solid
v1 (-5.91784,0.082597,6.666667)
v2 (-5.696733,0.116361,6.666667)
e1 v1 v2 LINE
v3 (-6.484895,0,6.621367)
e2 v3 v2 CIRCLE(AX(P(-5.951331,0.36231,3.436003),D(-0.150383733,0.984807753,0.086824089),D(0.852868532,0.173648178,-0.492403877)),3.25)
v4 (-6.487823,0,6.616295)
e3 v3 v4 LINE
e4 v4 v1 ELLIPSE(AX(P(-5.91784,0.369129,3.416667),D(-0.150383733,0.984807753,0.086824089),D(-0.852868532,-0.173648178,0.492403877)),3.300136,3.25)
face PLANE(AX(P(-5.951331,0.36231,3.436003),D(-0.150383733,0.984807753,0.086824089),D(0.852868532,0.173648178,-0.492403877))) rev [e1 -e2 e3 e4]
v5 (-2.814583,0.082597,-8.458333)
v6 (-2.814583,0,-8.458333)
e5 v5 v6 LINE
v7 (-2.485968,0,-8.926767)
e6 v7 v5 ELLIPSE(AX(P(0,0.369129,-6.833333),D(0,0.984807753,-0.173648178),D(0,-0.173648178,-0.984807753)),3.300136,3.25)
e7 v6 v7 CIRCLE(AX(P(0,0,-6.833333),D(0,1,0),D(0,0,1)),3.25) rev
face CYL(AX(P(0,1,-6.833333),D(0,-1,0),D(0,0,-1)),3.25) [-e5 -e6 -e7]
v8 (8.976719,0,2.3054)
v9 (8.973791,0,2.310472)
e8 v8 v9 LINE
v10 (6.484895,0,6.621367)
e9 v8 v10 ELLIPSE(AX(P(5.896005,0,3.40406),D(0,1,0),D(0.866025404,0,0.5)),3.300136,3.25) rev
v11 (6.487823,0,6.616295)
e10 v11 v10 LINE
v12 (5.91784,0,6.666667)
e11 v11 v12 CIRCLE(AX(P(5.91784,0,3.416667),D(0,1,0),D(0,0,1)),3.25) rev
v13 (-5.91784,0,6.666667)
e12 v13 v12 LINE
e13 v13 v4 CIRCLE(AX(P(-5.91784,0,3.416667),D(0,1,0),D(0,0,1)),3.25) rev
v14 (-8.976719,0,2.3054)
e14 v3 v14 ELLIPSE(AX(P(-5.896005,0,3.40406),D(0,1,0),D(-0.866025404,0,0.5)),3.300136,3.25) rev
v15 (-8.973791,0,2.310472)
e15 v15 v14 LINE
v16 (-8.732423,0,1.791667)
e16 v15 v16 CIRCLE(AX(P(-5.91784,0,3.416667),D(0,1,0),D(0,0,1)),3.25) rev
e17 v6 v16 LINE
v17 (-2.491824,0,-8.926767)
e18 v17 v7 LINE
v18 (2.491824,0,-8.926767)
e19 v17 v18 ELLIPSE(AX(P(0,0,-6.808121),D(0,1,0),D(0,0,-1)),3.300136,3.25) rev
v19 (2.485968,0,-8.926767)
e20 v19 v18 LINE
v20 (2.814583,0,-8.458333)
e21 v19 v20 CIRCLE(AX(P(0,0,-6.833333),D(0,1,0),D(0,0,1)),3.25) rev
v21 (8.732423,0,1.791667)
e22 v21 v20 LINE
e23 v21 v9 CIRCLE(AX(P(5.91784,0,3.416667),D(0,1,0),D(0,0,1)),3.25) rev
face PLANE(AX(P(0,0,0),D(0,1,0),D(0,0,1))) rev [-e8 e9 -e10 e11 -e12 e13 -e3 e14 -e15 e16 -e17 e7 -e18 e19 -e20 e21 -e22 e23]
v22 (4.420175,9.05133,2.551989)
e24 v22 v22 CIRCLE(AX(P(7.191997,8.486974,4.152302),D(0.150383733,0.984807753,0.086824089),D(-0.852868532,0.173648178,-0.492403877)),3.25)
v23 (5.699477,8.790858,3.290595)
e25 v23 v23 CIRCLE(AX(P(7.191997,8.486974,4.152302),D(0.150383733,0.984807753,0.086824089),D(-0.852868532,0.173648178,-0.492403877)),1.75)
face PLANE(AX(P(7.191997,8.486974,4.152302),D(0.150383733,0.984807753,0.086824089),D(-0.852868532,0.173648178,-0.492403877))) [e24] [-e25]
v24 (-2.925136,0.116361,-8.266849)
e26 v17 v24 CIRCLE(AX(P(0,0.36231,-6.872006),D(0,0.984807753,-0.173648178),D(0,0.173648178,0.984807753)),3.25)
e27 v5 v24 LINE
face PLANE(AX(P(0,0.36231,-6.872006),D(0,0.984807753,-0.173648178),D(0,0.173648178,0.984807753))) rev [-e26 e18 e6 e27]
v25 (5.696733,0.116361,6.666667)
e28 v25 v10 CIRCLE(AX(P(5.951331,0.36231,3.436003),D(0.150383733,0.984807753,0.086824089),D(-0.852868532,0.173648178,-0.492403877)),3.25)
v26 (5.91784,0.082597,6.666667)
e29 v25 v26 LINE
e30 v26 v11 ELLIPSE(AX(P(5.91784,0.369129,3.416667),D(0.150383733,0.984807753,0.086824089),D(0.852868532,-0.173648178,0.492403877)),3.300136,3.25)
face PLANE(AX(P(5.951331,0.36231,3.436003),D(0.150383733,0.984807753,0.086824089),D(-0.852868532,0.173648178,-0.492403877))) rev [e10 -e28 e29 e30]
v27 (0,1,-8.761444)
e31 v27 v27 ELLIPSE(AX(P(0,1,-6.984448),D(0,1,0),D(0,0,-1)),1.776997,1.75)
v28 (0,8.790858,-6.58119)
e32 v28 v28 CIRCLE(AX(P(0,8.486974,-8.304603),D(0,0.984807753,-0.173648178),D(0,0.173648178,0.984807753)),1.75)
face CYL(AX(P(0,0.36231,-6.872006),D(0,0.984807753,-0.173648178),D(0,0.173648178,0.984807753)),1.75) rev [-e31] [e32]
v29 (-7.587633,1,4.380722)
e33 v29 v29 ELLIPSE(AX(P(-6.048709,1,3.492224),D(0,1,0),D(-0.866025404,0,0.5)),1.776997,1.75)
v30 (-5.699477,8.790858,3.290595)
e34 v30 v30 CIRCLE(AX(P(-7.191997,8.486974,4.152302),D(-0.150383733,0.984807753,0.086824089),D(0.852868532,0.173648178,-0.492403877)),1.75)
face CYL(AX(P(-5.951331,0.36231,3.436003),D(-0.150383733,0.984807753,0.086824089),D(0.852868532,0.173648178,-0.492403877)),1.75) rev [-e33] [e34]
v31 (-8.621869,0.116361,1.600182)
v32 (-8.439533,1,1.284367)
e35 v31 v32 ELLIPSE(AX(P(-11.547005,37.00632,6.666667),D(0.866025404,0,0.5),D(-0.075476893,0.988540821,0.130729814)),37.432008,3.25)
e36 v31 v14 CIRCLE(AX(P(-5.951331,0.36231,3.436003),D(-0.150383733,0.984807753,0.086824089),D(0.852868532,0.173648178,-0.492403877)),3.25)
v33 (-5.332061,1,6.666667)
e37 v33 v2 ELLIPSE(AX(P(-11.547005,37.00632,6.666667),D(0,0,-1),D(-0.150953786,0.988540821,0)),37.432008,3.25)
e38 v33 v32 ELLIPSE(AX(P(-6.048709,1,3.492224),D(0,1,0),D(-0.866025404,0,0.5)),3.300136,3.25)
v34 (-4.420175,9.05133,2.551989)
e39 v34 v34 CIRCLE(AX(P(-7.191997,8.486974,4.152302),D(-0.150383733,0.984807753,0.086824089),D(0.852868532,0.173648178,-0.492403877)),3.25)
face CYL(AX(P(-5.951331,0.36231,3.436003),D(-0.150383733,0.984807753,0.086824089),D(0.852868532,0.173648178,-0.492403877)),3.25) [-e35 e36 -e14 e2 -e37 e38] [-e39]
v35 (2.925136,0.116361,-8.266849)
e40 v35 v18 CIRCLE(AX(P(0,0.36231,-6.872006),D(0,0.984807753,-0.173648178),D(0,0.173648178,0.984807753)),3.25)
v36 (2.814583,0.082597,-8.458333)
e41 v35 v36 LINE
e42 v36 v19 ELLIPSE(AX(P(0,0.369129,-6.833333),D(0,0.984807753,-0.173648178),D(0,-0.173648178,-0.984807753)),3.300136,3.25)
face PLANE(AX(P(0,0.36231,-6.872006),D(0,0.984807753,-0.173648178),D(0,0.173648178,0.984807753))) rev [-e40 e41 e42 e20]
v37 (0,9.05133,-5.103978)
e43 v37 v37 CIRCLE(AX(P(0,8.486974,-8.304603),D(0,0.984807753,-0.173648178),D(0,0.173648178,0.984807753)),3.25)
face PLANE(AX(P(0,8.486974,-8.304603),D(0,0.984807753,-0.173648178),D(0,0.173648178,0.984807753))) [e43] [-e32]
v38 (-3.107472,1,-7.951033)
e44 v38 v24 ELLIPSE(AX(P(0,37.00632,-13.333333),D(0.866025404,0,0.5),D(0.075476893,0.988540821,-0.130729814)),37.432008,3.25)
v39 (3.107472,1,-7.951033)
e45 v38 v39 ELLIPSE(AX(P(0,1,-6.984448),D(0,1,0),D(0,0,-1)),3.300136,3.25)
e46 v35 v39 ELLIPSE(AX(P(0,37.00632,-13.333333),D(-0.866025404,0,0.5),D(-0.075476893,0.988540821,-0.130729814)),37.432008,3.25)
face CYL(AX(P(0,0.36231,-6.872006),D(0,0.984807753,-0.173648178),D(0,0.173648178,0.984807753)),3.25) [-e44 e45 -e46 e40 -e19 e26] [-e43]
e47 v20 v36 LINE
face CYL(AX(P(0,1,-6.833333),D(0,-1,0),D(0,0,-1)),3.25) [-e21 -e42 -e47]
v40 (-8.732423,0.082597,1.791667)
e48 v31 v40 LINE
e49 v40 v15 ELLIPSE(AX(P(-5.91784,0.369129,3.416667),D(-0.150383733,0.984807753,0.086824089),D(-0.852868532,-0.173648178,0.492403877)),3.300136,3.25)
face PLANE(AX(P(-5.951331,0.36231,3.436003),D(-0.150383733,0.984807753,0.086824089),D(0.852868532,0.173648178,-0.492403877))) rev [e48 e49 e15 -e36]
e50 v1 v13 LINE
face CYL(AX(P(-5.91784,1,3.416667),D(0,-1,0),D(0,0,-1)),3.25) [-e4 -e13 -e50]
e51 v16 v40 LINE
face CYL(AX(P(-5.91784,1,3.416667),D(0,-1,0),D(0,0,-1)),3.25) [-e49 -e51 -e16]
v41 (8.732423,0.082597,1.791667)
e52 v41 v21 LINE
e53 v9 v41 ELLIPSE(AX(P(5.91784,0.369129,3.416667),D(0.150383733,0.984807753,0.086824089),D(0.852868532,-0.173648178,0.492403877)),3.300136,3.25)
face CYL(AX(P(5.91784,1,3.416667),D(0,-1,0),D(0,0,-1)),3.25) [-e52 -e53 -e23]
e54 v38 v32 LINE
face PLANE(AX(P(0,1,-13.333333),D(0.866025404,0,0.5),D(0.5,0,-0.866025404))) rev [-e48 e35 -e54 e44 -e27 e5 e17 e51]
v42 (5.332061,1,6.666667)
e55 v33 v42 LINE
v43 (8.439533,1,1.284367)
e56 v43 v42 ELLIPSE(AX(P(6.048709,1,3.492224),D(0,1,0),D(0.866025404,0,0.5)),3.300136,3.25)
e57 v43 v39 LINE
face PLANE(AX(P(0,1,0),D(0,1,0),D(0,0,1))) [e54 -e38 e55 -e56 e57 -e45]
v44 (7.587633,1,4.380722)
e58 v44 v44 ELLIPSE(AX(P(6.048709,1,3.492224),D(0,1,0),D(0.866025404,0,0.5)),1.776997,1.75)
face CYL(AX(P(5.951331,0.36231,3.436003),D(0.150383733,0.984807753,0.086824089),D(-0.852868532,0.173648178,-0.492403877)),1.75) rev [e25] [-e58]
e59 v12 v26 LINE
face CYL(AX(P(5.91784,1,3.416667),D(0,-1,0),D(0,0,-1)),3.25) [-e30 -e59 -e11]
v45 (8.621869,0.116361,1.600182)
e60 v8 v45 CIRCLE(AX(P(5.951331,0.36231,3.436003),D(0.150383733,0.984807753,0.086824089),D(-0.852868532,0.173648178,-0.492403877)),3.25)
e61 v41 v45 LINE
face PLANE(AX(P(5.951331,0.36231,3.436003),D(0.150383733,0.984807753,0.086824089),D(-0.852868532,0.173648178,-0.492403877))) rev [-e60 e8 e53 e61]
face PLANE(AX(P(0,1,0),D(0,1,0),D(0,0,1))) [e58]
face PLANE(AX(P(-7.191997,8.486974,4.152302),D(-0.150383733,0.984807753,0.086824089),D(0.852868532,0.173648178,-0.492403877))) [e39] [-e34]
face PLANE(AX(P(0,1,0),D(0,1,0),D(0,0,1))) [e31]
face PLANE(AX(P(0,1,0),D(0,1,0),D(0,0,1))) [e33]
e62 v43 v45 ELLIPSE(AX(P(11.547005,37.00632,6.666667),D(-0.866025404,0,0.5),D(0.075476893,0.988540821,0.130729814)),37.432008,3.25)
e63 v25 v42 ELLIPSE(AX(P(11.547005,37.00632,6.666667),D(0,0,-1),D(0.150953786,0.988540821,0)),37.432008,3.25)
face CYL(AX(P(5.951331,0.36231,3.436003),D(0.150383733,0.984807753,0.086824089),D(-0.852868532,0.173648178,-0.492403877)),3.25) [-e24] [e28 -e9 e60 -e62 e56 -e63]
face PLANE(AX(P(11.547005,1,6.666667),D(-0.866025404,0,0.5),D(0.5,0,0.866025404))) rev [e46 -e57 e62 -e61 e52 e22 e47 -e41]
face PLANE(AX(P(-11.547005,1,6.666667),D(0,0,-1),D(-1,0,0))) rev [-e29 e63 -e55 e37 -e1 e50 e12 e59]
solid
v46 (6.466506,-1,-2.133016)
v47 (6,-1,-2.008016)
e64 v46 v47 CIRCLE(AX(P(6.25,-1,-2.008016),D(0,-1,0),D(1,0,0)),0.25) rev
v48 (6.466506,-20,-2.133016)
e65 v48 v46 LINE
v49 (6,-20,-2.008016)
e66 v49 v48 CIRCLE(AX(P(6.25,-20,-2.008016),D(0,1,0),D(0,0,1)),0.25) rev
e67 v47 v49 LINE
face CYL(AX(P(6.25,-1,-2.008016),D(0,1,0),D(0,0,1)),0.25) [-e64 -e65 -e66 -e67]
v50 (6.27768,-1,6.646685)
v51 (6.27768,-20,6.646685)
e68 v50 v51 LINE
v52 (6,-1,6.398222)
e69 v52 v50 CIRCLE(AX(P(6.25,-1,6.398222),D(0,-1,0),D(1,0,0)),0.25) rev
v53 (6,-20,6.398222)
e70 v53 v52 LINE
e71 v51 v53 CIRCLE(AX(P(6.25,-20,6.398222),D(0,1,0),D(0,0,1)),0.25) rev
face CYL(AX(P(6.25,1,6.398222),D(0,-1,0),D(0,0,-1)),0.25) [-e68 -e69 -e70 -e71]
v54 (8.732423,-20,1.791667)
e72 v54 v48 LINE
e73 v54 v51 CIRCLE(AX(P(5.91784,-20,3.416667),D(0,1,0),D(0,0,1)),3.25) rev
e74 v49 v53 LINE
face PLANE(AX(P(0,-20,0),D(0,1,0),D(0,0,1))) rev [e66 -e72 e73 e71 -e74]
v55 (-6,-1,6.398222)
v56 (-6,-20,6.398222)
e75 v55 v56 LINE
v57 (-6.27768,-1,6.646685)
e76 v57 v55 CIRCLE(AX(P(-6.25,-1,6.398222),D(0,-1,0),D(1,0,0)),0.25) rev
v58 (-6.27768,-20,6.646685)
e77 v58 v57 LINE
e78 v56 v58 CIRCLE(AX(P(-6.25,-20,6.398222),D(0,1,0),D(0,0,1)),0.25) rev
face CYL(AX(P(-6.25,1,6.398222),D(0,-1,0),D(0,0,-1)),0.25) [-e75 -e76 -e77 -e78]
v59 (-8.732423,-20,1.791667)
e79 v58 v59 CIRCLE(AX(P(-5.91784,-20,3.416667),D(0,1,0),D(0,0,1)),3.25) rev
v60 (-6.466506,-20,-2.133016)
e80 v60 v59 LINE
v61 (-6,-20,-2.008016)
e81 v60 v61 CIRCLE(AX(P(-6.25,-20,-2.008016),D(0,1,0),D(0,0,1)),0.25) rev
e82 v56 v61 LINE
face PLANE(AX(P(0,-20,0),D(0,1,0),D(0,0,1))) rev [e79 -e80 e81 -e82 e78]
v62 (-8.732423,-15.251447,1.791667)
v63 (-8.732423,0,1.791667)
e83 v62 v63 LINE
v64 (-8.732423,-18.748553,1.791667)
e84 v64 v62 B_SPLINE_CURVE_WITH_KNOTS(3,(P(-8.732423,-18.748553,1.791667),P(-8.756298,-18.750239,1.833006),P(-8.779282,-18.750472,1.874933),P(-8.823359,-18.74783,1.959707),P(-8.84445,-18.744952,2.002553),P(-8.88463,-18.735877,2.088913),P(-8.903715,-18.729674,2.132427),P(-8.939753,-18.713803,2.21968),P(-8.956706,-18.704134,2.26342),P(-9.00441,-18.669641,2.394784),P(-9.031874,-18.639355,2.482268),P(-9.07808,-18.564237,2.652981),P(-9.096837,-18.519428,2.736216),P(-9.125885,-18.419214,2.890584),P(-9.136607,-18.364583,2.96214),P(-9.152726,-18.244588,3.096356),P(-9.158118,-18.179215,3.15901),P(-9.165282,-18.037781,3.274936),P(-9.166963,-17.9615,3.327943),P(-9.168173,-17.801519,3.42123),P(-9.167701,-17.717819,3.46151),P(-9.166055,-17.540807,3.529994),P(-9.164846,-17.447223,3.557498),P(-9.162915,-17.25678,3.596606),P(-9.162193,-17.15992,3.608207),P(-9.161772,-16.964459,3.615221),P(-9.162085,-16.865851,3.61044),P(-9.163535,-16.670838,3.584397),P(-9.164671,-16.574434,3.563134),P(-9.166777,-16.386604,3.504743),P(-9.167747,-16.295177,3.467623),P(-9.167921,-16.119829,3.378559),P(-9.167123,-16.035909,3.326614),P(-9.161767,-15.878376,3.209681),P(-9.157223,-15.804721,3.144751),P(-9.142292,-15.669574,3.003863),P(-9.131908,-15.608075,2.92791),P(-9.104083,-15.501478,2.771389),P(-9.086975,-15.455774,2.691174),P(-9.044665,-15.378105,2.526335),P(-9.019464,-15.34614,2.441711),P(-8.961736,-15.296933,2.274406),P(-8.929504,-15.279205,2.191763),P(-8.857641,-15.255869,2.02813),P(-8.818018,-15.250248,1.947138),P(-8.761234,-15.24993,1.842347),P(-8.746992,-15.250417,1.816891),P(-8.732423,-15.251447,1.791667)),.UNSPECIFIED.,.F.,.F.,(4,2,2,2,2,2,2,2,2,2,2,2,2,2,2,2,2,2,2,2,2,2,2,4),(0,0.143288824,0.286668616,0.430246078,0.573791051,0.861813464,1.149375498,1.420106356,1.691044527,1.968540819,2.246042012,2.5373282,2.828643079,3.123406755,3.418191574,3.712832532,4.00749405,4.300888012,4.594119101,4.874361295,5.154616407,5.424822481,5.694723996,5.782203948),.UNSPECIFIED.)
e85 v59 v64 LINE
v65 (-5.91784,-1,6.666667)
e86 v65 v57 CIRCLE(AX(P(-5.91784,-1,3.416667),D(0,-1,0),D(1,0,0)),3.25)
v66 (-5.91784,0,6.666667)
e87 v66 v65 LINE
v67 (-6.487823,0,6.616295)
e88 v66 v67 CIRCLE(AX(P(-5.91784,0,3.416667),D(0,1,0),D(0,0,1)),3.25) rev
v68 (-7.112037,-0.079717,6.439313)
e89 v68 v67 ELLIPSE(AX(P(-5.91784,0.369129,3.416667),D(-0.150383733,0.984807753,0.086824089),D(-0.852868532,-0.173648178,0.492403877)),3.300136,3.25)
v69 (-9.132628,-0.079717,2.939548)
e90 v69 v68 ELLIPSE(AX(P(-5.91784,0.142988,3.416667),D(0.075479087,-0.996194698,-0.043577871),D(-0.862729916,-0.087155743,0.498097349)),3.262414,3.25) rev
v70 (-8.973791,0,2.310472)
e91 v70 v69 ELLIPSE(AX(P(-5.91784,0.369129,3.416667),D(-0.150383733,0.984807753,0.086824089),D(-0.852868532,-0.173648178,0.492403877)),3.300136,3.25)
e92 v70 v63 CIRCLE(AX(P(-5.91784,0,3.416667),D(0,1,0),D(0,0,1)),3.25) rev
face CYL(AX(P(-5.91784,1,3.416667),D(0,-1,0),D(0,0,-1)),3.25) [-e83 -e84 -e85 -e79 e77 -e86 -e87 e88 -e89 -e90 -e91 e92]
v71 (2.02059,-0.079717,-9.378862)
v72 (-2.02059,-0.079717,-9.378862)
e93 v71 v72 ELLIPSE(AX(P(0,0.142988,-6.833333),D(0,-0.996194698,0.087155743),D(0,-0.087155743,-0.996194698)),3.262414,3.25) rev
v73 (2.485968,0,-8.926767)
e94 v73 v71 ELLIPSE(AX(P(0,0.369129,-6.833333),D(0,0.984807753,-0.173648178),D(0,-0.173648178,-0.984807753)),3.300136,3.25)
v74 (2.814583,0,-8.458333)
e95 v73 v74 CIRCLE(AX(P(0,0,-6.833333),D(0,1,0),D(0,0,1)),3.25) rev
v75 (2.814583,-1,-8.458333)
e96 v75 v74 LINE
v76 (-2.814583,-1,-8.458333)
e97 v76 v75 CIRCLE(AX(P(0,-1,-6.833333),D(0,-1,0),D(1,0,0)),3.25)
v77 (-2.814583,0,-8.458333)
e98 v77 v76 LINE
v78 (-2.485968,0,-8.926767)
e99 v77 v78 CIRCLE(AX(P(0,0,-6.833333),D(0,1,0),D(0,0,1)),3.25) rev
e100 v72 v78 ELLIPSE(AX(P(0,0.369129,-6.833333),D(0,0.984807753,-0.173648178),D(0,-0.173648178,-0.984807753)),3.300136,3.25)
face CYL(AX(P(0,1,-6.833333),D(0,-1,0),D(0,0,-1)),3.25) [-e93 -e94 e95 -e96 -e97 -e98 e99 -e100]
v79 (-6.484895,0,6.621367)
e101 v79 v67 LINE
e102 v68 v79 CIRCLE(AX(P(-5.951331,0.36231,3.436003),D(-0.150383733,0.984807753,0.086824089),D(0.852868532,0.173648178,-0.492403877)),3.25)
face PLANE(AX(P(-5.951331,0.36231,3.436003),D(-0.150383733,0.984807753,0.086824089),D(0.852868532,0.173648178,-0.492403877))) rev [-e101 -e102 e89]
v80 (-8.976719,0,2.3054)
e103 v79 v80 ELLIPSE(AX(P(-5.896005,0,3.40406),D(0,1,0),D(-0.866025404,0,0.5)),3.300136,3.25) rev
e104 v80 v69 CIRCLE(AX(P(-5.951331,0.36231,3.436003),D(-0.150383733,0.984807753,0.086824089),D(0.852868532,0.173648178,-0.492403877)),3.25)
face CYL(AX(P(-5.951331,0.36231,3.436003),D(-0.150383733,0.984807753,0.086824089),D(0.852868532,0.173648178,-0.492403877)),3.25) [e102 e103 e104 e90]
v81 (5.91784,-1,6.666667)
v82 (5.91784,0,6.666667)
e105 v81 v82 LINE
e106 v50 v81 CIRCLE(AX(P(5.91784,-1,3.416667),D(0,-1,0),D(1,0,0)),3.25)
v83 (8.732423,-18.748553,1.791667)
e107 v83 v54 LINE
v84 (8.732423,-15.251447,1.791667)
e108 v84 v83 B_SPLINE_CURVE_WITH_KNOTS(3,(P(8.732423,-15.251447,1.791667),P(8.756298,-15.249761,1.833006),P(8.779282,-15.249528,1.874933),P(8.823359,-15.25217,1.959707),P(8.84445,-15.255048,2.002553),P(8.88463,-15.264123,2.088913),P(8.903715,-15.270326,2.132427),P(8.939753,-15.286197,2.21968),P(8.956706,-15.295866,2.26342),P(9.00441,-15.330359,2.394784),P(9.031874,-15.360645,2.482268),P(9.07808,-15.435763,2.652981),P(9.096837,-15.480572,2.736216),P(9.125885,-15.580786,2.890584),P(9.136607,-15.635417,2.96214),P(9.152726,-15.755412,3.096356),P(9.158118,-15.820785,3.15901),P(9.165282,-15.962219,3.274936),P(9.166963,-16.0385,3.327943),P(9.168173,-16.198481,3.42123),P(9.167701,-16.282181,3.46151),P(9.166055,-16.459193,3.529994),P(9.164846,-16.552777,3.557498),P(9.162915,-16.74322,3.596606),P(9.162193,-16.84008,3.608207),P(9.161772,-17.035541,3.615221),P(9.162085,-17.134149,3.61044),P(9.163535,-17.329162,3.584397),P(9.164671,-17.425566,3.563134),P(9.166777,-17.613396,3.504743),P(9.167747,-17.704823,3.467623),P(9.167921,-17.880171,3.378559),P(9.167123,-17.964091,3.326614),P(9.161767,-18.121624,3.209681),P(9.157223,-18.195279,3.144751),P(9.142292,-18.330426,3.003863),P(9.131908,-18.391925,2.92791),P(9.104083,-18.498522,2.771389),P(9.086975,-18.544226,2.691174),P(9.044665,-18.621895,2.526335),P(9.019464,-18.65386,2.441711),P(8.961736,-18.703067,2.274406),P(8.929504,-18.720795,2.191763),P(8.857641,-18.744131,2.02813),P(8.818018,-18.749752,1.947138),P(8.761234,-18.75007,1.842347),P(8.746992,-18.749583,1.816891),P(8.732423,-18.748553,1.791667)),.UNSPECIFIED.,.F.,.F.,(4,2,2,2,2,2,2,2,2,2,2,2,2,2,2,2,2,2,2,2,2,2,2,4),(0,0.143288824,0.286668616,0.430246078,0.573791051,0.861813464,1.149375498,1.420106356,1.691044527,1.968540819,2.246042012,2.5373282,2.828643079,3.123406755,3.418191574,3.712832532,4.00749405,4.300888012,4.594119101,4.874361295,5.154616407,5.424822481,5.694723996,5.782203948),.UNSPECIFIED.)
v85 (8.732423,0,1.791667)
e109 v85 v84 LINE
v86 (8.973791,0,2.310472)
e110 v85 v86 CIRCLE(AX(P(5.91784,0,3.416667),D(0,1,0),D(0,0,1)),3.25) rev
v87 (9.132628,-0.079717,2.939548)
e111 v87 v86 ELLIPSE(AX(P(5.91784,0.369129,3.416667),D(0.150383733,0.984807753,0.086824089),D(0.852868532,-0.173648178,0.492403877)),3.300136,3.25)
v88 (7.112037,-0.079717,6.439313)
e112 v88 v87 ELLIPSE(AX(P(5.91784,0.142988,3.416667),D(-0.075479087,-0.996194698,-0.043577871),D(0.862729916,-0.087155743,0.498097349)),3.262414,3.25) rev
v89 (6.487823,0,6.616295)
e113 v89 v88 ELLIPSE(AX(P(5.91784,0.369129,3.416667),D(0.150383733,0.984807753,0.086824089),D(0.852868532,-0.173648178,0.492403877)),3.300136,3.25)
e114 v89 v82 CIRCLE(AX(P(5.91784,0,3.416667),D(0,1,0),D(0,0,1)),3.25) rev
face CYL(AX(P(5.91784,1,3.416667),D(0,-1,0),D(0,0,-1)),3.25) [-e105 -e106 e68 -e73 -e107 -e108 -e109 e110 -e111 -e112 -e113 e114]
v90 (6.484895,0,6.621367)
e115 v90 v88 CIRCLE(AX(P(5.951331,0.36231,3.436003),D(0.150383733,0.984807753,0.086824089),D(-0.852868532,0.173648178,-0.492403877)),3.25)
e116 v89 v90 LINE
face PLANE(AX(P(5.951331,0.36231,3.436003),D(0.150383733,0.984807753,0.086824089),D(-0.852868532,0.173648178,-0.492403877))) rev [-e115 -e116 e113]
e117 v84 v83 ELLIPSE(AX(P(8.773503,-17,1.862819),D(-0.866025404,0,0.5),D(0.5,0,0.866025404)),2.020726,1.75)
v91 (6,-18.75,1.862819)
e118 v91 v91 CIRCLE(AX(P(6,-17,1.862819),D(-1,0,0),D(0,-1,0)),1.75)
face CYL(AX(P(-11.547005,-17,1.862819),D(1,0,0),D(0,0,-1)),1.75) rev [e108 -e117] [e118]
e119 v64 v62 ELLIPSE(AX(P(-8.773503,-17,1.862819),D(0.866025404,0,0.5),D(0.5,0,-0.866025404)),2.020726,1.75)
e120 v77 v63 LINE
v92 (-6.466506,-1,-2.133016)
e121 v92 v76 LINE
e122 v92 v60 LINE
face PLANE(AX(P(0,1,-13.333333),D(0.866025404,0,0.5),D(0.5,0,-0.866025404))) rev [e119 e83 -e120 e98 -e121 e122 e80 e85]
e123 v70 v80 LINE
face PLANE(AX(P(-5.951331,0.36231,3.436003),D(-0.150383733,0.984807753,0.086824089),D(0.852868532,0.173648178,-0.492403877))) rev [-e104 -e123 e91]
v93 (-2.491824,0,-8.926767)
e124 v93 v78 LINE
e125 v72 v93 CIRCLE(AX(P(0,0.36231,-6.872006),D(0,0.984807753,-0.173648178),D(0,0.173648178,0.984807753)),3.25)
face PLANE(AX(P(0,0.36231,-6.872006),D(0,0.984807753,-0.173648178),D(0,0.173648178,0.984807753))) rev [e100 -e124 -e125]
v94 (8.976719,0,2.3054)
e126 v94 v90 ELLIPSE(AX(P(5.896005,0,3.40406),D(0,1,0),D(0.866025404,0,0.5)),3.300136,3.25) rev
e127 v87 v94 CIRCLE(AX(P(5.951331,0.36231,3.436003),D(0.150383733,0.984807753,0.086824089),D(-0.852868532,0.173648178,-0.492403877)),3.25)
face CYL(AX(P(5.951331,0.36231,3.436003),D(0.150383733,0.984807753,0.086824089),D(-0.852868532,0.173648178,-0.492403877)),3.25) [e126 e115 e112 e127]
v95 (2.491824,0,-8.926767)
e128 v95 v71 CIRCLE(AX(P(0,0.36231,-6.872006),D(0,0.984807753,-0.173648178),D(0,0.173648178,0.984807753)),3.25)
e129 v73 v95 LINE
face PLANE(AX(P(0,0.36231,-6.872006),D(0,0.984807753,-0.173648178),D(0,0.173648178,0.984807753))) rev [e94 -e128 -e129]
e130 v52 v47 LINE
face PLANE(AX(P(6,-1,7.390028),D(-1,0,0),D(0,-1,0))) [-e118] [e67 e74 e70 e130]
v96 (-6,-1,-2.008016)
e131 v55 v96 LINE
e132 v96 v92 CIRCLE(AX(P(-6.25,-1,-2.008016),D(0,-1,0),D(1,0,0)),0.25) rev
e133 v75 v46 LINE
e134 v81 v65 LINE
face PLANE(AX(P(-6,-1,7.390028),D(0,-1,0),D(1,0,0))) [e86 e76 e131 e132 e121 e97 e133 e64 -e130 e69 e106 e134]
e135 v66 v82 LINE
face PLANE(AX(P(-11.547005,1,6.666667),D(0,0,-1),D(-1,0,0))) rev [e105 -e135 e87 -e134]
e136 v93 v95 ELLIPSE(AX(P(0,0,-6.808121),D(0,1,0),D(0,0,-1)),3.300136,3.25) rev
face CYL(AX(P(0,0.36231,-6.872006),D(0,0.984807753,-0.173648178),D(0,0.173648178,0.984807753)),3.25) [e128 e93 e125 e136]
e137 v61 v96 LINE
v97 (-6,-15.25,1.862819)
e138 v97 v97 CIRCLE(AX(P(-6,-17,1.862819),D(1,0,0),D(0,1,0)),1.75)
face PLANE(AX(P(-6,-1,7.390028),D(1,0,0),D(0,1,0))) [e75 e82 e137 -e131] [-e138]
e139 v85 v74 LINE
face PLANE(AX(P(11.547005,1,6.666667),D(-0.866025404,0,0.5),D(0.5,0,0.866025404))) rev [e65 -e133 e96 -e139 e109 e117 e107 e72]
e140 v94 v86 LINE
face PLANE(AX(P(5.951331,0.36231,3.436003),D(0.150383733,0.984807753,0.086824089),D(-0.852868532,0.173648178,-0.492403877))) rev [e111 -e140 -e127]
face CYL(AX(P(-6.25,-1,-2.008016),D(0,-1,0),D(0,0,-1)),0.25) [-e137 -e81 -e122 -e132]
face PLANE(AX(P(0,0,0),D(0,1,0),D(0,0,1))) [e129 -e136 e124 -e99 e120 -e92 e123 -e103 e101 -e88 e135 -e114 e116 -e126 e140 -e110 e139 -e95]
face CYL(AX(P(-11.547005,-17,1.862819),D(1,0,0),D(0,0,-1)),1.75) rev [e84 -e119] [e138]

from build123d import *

# Parameters (mm, degrees)
BOSS_EXTRUDE1_DEPTH     = 1
BOSS_EXTRUDE2_START     = -0.013518
SKETCH2_R               = 3.25
SKETCH2_R_2             = 1.75
BOSS_EXTRUDE2_DEPTH     = 8.25
CIRPATTERN4_COUNT       = 3
BOSS_EXTRUDE3_DEPTH     = 20
CUT_EXTRUDE1_DEPTH      = 27.666666667
CUT_EXTRUDE1_DEPTH_BACK = 27.666666667
SKETCH5_W               = 12
SKETCH5_H               = 19
CUT_EXTRUDE2_DEPTH      = 27.666666667
CUT_EXTRUDE2_DEPTH_BACK = 27.666666667
SKETCH6_R               = 1.75
FILLET1_R               = 3.25
FILLET2_R               = 0.25


with BuildPart() as part:
    # Sketch1 → Boss-Extrude1 (new body)
    with BuildSketch(Plane(origin=(0, 0, 0), x_dir=(1, 0, 0), z_dir=(0, 1, 0))):
        Polygon((0, 13.333333333), (-11.547005384, -6.666666667), (11.547005384, -6.666666667), align=None)
    extrude(amount=BOSS_EXTRUDE1_DEPTH)

    # Sketch2 → Boss-Extrude2 (add)
    with BuildSketch(Plane(origin=(0, 1.539879883, -0.27152237), x_dir=(1, 0, 0), z_dir=(0, 0.984807753012208, -0.17364817766693072)).offset(BOSS_EXTRUDE2_START)):
        with Locations(Location((0, 6.704689978, 0), (0, 0, 270))):
            Circle(SKETCH2_R)
        with Locations(Location((0, 6.704689978, 0), (0, 0, 270))):
            Circle(SKETCH2_R_2, mode=Mode.SUBTRACT)
    extrude(amount=BOSS_EXTRUDE2_DEPTH)


with BuildPart() as cirpattern4_1:
    # CirPattern4: pattern copy
    add(part.part.rotate(Axis((0, 0, 0), (0, 1, 0)), 1 * 360 / CIRPATTERN4_COUNT))


with BuildPart() as cirpattern4_2:
    # CirPattern4: pattern copy
    add(part.part.rotate(Axis((0, 0, 0), (0, 1, 0)), 2 * 360 / CIRPATTERN4_COUNT))


with BuildPart() as part_1:
    add(part.part)

    add(cirpattern4_1.part)  # Boss-Extrude3 merges CirPattern4_1

    add(cirpattern4_2.part)  # Boss-Extrude3 merges CirPattern4_2
    # Sketch3 → Boss-Extrude3 (add)
    with BuildSketch(Plane(origin=(0, 0, 0), x_dir=(1, 0, 0), z_dir=(0, 1, 0))):
        Polygon((0, 13.333333333), (-11.547005384, -6.666666667), (11.547005384, -6.666666667), align=None)
    extrude(amount=-BOSS_EXTRUDE3_DEPTH)

    # Sketch5 → Cut-Extrude1 (cut, two sides: drawn at the far end of the back side and taken through both)
    with BuildSketch(Plane.XY.offset(-CUT_EXTRUDE1_DEPTH_BACK)):
        with Locations((0, -10.5)):
            Rectangle(SKETCH5_W, SKETCH5_H)
    extrude(amount=CUT_EXTRUDE1_DEPTH + CUT_EXTRUDE1_DEPTH_BACK, mode=Mode.SUBTRACT)

    # Sketch6 → Cut-Extrude2 (cut, two sides: drawn at the far end of the back side and taken through both)
    with BuildSketch(Plane(origin=(0, 0, 0), x_dir=(0, 0, -1), z_dir=(1, 0, 0)).offset(-CUT_EXTRUDE2_DEPTH_BACK)):
        with Locations(Location((-1.862819089, -17, 0), (0, 0, 270))):
            Circle(SKETCH6_R)
    extrude(amount=CUT_EXTRUDE2_DEPTH + CUT_EXTRUDE2_DEPTH_BACK, mode=Mode.SUBTRACT)

    # Fillet1
    # the kernel refuses this fillet: 3.25 mm, written as the material it takes off along each edge
    with BuildSketch(Plane(origin=(-11.547005384, -34.072912811, 6.666666667), x_dir=(0.5000000000000006, 0, -0.8660254037844383), z_dir=(0, 1, 0))) as fillet1_piece_1_section:
        with BuildLine():
            CenterArc((FILLET1_R * 1.73205080757, -FILLET1_R), FILLET1_R, 90, 120)
            Line((FILLET1_R * 0.866025403784, -FILLET1_R * 1.5), (0, 0))
            Line((0, 0), (FILLET1_R * 1.73205080757, 0))
        make_face()
    fillet1_piece_1 = extrude(amount=49.145825623, mode=Mode.PRIVATE)
    fillet1_piece_1 = split(fillet1_piece_1, bisect_by=Plane(origin=(-10.97448612, -0.66169158, 6.350447494), z_dir=(0.15038373318043566, -0.9848077530122081, -0.08682408883346533)), keep=Keep.TOP, mode=Mode.PRIVATE)
    add(fillet1_piece_1, mode=Mode.SUBTRACT)
    with BuildSketch(Plane(origin=(-11.547005384, -34.072912811, 6.666666667), x_dir=(0.5000000000000006, 0, -0.8660254037844383), z_dir=(0, 1, 0))) as fillet1_piece_2_section:
        with BuildLine():
            CenterArc((FILLET1_R * 1.73205080757, -FILLET1_R), FILLET1_R, 90, 120)
            Line((FILLET1_R * 0.866025403784, -FILLET1_R * 1.5), (0, 0))
            Line((0, 0), (FILLET1_R * 1.73205080757, 0))
        make_face()
    fillet1_piece_2 = extrude(amount=49.145825623, mode=Mode.PRIVATE)
    fillet1_piece_2 = fillet1_piece_2 - Plane(origin=(-6.05222024, 1.022993423, 3.494250985), x_dir=(0.8528685319524435, 0.17364817766693075, -0.4924038765061036), z_dir=(0.15038373318043563, -0.984807753012208, -0.0868240888334653)) * Cylinder(3.25, 121, mode=Mode.PRIVATE)
    add(fillet1_piece_2, mode=Mode.SUBTRACT)
    with BuildSketch(Plane(origin=(11.547005384, 15.072912811, 6.666666667), x_dir=(-0.4999999999999995, 3.2869908736946534e-15, -0.866025403784439), z_dir=(0, -1, 0))) as fillet1_piece_3_section:
        with BuildLine():
            CenterArc((FILLET1_R * 1.73205080757, -FILLET1_R), FILLET1_R, 90, 120)
            Line((FILLET1_R * 0.866025403784, -FILLET1_R * 1.5), (0, 0))
            Line((0, 0), (FILLET1_R * 1.73205080757, 0))
        make_face()
    fillet1_piece_3 = extrude(amount=49.145825623, mode=Mode.PRIVATE)
    fillet1_piece_3 = split(fillet1_piece_3, bisect_by=Plane(origin=(6.196775139, 0.040615558, 6.659722255), z_dir=(-0.15038373318043557, -0.9848077530122081, -0.08682408883346546)), keep=Keep.TOP, mode=Mode.PRIVATE)
    add(fillet1_piece_3, mode=Mode.SUBTRACT)
    with BuildSketch(Plane(origin=(11.547005384, 15.072912811, 6.666666667), x_dir=(-0.4999999999999995, 3.2869908736946534e-15, -0.866025403784439), z_dir=(0, -1, 0))) as fillet1_piece_4_section:
        with BuildLine():
            CenterArc((FILLET1_R * 1.73205080757, -FILLET1_R), FILLET1_R, 90, 120)
            Line((FILLET1_R * 0.866025403784, -FILLET1_R * 1.5), (0, 0))
            Line((0, 0), (FILLET1_R * 1.73205080757, 0))
        make_face()
    fillet1_piece_4 = extrude(amount=49.145825623, mode=Mode.PRIVATE)
    fillet1_piece_4 = fillet1_piece_4 - Plane(origin=(6.05222024, 1.022993422, 3.494250985), x_dir=(-0.8528685319524428, 0.17364817766693072, -0.4924038765061047), z_dir=(-0.15038373318043557, -0.984807753012208, -0.08682408883346546)) * Cylinder(3.25, 121, mode=Mode.PRIVATE)
    add(fillet1_piece_4, mode=Mode.SUBTRACT)
    with BuildSketch(Plane(origin=(0, -15.072912811, -13.333333333), x_dir=(0.49999999999999967, -2.8617107450297637e-15, 0.8660254037844389), z_dir=(0, 1, 0))) as fillet1_piece_5_section:
        with BuildLine():
            CenterArc((FILLET1_R * 1.73205080757, -FILLET1_R), FILLET1_R, 90, 120)
            Line((FILLET1_R * 0.866025403784, -FILLET1_R * 1.5), (0, 0))
            Line((0, 0), (FILLET1_R * 1.73205080757, 0))
        make_face()
    fillet1_piece_5 = extrude(amount=30.145825623, mode=Mode.PRIVATE)
    fillet1_piece_5 = split(fillet1_piece_5, bisect_by=Plane(origin=(-4e-09, -0.328352859, -10.788949692), z_dir=(0, -0.984807753012208, 0.17364817766693072)), keep=Keep.TOP, mode=Mode.PRIVATE)
    add(fillet1_piece_5, mode=Mode.SUBTRACT)
    with BuildSketch(Plane(origin=(0, -15.072912811, -13.333333333), x_dir=(0.49999999999999967, -2.8617107450297637e-15, 0.8660254037844389), z_dir=(0, 1, 0))) as fillet1_piece_6_section:
        with BuildLine():
            CenterArc((FILLET1_R * 1.73205080757, -FILLET1_R), FILLET1_R, 90, 120)
            Line((FILLET1_R * 0.866025403784, -FILLET1_R * 1.5), (0, 0))
            Line((0, 0), (FILLET1_R * 1.73205080757, 0))
        make_face()
    fillet1_piece_6 = extrude(amount=30.145825623, mode=Mode.PRIVATE)
    fillet1_piece_6 = fillet1_piece_6 - Plane(origin=(0, 1.022993423, -6.98850197), x_dir=(0, 0.17364817766693072, 0.984807753012208), z_dir=(0, -0.984807753012208, 0.17364817766693072)) * Cylinder(3.25, 83, mode=Mode.PRIVATE)
    add(fillet1_piece_6, mode=Mode.SUBTRACT)

    # Fillet2
    fillet2_edges = [part_1.edges().sort_by_distance(p)[0] for p in [
        (-6, -10.5, -2.941028488),
        (6, -10.5, -2.941028488),
        (-6, -10.5, 6.665628005),
        (6, -10.5, 6.665628005),
    ]]
    fillet(fillet2_edges, radius=FILLET2_R)


with BuildPart() as body_2:
    # Split1: the piece on the far side of the plane
    add(part_1.part)
    split(bisect_by=Plane.ZX, keep=Keep.BOTTOM)


with BuildPart() as part_2:
    add(part_1.part)

    # Split1
    split(bisect_by=Plane.ZX, keep=Keep.TOP)


solid = Compound([body_2.part, part_2.part])
